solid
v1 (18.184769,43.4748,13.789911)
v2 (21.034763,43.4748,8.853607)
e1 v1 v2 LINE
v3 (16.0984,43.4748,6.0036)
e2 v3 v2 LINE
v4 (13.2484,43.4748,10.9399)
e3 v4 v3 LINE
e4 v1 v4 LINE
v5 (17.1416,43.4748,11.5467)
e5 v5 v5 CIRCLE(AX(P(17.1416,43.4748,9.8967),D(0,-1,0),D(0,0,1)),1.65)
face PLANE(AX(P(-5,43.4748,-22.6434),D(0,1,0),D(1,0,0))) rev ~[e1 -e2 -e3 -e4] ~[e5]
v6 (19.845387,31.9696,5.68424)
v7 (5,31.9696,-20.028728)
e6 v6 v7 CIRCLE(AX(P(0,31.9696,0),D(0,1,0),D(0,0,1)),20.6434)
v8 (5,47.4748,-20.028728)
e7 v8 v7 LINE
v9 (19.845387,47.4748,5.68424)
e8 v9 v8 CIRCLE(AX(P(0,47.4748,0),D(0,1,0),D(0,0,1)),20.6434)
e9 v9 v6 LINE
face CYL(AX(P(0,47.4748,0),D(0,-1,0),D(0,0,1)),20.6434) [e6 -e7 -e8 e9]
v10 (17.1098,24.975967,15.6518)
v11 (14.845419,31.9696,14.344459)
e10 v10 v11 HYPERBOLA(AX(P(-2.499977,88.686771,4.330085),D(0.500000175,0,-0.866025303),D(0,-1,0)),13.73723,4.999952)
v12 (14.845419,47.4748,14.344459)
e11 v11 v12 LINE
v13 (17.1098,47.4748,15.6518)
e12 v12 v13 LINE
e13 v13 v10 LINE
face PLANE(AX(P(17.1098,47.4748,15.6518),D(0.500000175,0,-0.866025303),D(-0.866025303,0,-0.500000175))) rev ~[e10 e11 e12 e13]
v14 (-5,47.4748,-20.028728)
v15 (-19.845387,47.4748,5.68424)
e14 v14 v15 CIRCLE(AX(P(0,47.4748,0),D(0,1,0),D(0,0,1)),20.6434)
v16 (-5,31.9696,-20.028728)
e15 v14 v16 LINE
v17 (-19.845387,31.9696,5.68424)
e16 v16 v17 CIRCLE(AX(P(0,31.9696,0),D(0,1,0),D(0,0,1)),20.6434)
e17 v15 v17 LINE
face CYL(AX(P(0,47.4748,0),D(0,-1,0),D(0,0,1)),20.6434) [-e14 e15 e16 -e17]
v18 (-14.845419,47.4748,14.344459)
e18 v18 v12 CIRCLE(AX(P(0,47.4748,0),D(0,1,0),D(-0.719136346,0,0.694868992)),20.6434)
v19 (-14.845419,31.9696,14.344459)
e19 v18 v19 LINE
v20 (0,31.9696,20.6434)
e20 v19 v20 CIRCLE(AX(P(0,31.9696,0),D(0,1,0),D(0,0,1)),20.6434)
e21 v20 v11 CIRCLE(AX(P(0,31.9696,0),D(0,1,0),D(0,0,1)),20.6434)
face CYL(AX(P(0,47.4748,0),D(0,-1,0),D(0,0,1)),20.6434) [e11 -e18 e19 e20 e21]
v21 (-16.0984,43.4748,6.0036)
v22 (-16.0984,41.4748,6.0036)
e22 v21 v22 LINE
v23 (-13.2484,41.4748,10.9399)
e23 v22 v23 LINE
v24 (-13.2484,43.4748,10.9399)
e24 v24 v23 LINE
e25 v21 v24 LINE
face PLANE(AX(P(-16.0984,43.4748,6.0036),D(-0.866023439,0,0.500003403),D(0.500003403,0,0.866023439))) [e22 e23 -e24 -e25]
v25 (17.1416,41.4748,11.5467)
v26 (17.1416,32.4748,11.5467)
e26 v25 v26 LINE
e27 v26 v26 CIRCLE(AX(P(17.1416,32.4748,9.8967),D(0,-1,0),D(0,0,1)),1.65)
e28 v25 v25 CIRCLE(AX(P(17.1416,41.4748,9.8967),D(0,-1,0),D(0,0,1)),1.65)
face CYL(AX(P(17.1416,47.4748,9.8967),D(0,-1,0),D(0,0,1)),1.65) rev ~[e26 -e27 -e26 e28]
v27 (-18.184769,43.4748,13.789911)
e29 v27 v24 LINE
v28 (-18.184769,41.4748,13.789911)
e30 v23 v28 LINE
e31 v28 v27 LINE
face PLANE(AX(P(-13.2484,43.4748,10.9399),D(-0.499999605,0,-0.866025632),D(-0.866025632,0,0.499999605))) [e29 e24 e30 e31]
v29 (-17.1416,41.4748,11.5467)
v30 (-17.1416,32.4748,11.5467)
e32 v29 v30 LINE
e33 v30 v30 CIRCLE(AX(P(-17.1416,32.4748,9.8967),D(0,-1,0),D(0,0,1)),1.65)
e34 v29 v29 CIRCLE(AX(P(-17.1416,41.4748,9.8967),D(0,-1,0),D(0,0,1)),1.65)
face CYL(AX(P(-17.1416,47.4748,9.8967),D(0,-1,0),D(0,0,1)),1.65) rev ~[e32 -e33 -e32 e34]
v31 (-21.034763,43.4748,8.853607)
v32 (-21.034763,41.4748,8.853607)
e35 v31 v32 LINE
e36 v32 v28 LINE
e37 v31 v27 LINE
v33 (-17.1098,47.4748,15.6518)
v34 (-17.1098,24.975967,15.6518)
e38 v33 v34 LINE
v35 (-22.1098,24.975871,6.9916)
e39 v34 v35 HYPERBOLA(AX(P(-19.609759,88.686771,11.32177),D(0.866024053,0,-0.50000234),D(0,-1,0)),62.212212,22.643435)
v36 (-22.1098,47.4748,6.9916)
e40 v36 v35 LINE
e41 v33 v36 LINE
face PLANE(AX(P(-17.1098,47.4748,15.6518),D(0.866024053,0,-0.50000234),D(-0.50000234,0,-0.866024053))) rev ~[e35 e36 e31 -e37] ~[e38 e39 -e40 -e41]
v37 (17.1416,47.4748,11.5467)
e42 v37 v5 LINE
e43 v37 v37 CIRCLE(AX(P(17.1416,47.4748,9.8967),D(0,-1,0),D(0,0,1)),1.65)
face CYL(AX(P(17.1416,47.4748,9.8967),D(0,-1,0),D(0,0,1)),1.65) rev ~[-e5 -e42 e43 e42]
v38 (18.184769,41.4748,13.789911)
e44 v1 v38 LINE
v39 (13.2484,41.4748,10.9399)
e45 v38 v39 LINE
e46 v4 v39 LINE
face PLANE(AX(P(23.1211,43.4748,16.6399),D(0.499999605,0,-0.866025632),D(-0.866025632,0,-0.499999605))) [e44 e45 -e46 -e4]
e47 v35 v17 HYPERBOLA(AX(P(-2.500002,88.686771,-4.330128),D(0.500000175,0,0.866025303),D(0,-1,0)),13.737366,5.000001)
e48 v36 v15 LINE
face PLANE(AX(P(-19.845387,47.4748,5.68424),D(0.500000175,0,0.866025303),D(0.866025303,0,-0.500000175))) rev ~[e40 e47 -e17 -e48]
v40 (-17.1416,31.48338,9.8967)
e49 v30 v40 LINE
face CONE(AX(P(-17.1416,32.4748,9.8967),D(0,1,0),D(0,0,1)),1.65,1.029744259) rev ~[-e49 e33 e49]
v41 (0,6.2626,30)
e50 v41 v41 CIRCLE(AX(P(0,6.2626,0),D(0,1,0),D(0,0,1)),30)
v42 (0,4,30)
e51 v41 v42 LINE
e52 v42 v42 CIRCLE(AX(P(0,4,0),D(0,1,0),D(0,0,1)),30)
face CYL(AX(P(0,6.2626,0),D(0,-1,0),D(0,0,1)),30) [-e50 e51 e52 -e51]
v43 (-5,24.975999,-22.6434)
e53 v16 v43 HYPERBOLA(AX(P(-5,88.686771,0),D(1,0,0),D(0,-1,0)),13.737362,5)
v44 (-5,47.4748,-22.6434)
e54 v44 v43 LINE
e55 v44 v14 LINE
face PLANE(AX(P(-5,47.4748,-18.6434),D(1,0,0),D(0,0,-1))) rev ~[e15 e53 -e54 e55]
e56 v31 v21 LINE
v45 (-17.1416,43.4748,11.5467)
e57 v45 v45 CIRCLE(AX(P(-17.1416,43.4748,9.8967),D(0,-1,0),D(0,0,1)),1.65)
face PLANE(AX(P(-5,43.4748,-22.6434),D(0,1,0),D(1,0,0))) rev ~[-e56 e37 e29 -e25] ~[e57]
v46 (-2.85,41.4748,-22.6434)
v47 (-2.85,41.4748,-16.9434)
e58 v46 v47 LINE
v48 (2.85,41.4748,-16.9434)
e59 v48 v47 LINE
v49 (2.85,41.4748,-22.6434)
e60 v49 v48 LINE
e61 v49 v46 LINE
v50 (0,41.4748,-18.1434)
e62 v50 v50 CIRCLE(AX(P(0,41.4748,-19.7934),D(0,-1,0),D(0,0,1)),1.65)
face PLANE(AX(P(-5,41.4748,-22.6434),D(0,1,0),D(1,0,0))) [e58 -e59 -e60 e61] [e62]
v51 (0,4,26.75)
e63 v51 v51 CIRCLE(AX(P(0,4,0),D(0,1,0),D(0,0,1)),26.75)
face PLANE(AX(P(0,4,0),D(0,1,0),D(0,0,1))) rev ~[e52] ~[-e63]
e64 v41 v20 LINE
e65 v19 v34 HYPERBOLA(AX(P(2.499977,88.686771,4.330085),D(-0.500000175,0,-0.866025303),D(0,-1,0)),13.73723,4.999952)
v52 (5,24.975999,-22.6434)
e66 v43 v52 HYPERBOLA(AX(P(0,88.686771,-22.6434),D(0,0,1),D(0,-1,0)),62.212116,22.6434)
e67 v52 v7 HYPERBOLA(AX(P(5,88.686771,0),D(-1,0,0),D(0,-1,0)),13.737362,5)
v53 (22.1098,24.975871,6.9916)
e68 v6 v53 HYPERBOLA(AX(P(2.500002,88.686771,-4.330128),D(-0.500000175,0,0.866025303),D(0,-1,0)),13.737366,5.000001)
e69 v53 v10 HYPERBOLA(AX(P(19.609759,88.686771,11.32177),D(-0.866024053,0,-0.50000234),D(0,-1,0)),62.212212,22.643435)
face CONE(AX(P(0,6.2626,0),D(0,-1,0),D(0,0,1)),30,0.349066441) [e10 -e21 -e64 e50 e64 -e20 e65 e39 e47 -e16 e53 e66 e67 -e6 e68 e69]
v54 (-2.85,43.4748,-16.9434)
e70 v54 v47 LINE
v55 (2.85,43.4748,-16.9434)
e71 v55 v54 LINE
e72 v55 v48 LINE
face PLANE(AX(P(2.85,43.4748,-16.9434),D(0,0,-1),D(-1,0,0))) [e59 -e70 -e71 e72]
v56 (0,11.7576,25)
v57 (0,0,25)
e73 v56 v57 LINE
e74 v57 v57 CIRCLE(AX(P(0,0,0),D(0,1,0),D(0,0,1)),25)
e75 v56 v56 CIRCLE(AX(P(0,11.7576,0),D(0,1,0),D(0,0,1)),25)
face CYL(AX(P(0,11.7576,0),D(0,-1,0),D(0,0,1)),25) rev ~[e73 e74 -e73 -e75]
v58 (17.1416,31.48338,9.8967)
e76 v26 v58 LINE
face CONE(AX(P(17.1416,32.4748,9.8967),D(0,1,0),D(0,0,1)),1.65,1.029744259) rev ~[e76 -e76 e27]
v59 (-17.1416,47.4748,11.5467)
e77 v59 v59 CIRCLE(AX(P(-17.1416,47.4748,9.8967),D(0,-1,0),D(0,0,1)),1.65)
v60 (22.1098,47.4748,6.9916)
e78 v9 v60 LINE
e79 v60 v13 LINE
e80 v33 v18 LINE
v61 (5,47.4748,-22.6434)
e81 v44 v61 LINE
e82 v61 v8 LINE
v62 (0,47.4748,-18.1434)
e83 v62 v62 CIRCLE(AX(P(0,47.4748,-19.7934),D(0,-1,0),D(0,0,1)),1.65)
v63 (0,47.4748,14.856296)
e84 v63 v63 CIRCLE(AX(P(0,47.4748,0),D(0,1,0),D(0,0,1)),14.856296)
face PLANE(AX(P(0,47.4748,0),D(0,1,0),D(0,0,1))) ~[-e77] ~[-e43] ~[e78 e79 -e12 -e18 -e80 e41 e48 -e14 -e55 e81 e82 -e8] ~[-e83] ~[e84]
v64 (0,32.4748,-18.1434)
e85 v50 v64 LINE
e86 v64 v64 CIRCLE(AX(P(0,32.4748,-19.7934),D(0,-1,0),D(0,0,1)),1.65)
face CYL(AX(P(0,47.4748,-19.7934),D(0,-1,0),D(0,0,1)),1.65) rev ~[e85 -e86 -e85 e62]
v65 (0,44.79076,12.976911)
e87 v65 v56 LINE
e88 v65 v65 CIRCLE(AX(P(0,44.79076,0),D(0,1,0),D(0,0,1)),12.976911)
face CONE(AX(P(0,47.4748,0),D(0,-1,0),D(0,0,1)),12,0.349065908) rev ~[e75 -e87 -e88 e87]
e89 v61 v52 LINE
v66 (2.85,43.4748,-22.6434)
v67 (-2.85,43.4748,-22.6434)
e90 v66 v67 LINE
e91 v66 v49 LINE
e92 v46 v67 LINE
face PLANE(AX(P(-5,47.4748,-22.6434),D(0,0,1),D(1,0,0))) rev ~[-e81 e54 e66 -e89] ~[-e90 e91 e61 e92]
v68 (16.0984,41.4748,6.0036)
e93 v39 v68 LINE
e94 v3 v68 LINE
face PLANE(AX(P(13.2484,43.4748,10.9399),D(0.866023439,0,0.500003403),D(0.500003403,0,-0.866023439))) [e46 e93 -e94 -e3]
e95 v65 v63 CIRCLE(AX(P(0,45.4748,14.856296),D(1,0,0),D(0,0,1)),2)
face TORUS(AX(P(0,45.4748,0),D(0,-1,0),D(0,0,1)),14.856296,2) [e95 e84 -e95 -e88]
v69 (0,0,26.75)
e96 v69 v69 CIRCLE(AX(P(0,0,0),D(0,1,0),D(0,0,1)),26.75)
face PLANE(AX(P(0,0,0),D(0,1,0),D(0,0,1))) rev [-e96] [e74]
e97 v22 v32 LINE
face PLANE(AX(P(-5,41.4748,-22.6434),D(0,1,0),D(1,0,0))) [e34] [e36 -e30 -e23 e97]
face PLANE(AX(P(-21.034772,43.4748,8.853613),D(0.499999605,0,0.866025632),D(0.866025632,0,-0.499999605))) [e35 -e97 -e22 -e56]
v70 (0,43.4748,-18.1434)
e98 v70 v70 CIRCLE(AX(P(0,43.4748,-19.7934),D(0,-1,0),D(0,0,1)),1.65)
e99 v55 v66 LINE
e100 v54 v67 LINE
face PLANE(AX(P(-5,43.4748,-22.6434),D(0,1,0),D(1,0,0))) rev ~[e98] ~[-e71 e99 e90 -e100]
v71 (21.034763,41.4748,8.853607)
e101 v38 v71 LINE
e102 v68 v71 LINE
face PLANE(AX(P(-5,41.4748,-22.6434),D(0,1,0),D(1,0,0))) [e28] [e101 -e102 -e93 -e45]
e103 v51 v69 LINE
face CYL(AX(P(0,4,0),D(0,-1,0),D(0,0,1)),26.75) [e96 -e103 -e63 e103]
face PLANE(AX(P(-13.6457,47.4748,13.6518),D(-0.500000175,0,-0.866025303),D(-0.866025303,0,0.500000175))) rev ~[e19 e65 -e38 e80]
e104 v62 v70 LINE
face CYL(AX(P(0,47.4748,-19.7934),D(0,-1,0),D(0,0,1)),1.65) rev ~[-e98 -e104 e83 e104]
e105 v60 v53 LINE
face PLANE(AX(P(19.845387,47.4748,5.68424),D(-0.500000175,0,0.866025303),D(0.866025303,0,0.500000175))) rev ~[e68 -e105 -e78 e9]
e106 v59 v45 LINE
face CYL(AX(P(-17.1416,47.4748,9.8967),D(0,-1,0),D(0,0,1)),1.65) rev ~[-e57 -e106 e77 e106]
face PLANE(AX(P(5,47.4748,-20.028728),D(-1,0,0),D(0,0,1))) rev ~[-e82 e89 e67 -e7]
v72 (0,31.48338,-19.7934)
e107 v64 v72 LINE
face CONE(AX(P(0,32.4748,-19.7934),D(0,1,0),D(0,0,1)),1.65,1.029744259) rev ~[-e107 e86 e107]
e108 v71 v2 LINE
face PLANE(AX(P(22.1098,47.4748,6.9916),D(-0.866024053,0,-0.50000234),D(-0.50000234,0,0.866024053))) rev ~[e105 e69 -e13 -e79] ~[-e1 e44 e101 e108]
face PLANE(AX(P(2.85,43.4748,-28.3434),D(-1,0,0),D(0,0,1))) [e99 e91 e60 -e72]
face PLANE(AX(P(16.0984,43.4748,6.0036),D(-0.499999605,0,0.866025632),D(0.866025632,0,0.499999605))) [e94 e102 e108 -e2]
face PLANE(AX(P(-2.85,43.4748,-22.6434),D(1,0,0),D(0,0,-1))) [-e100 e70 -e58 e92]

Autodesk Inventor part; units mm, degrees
ref_plane "YZ Plane" through (0, 0, 0) normal (1, 0, 0) x (0, 1, 0)
ref_plane "XZ Plane" through (0, 0, 0) normal (0, 1, 0) x (-1, 0, 0)
ref_plane "XY Plane" through (0, 0, 0) normal (0, 0, 1) x (1, 0, 0)
sketch "Skizze2" plane through (0, 0, 0) normal (1, 0, 0) x (0, 1, 0)
  line L0 (47.4748, 12) -> (11.7576, 25)
  line L1 (0, 0) -> (48.6481, 0)
  line L2 (47.4748, 12) -> (47.4748, 20.6434)
  line L3 (47.4748, 20.6434) -> (31.9696, 20.6434)
  line L4 (6.2626, 30) -> (31.9696, 20.6434)
  line L5 (4, 30) -> (4, 26.75)
  line L6 (4, 26.75) -> (0, 26.75)
  line L7 (6.2626, 30) -> (4, 30)
  line L8 (11.7576, 25) -> (0, 25)
  line L9 (0, 25) -> (0, 26.75)
  line L10 (0, 0) -> (0, 25) construction
  dimension "d21" = 24
  dimension "d22" = 20
  dimension "d115" = 15.5052
  dimension "d164" = 60
  dimension "d166" = 53.5
  dimension "d167" = 50
  dimension "d168" = 4
  dimension "d169" = 3.25
  dimension "d170" = 8.6434
  dimension "d171" = 47.4748
revolve "Umdrehung1" add sketch "Skizze2" angle 360 about axis through (0, 0, 0) along (0, 1, 0)
sketch "Skizze15" plane through (0, 47.4748, 0) normal (0, 1, 0) x (1, 0, 0)
  circle A0 centre (0, 0) radius 20.6434 projected
  circle A1 centre (0, 0) radius 12 projected
  line L0 (-5, 18.6434) -> (-5, 22.6434)
  line L1 (-5, 22.6434) -> (5, 22.6434)
  line L2 (5, 22.6434) -> (5, 18.6434)
  line L3 (5, 18.6434) -> (-5, 18.6434)
  line L4 (-5, 18.6434) -> (5, 22.6434) construction
  line L5 (-5, 22.6434) -> (5, 18.6434) construction
  line L6 (-17.1098, -15.6518) -> (-22.1098, -6.9916)
  line L7 (-22.1098, -6.9916) -> (-18.6457, -4.9916)
  line L8 (-18.6457, -4.9916) -> (-13.6457, -13.6518)
  line L9 (-13.6457, -13.6518) -> (-17.1098, -15.6518)
  line L10 (22.1098, -6.9916) -> (17.1098, -15.6518)
  line L11 (17.1098, -15.6518) -> (13.6457, -13.6518)
  line L12 (13.6457, -13.6518) -> (18.6457, -4.9916)
  line L13 (18.6457, -4.9916) -> (22.1098, -6.9916)
  point P0 (0, 20.6434)
  dimension "d129" = 10
  dimension "d130" = 4
  dimension "d131" = 18.6434
  dimension "d134" = 360
extrude "Extrusion12" add sketch "Skizze15" against normal blind 25 contours L2 L3 L0 A0 | A0 L0 L1 L2 | L13 L10 L11 A0 | A0 L11 L12 L13 | L7 L8 L9 A0 | A0 L9 L6 L7
delete faces "Fläche löschen5" heal yes whole lump no faces at (0, 24.7239, -18.6434) (0.5603, 22.4748, -19.4397)
delete faces "Fläche löschen6" heal yes whole lump no faces at (17.1154, 22.4748, 9.2346) (16.1457, 24.7239, 9.3217)
delete faces "Fläche löschen7" heal yes whole lump no faces at (-16.5551, 22.4748, 10.2051) (-16.1457, 24.7239, 9.3217)
ref_plane "Arbeitsebene2" through (-5, 43.4748, -22.6434) normal (0, 1, 0) x (1, 0, 0)
sketch "Skizze16" plane through (-5, 43.4748, -22.6434) normal (0, 1, 0) x (1, 0, 0)
  line L0 (-17.1098, -29.635) -> (-12.1098, -38.2953) projected
  line L1 (0, 0) -> (10, 0) projected
  line L2 (2.15, 5.7) -> (7.85, 5.7)
  line L3 (7.85, 5.7) -> (7.85, -5.7)
  line L4 (7.85, -5.7) -> (2.15, -5.7)
  line L5 (2.15, -5.7) -> (2.15, 5.7)
  line L6 (2.15, 5.7) -> (7.85, -5.7) construction
  line L7 (7.85, 5.7) -> (2.15, -5.7) construction
  line L8 (-20.9711, -34.347) -> (-11.0984, -28.647)
  line L9 (-18.1211, -39.2833) -> (-20.9711, -34.347)
  line L10 (-8.2484, -33.5833) -> (-18.1211, -39.2833)
  line L11 (-11.0984, -28.647) -> (-8.2484, -33.5833)
  line L12 (28.1211, -39.2833) -> (18.2484, -33.5833)
  line L13 (30.9711, -34.347) -> (28.1211, -39.2833)
  line L14 (21.0984, -28.647) -> (30.9711, -34.347)
  line L15 (18.2484, -33.5833) -> (21.0984, -28.647)
  point P0 (5, -22.6434)
  point P1 (5, 0)
  dimension "d139" = 5.7
  dimension "d140" = 11.4
  dimension "d143" = 360
extrude "Extrusion13" cut sketch "Skizze16" against normal blind 2
sketch "Skizze17" plane through (-5, 47.4748, -22.6434) normal (0, 1, 0) x (1, 0, 0)
  line L0 (0, 0) -> (10, 0) projected
  line L1 (5, -22.6434) -> (5, -2.85) construction
  point P0 (-12.1416, -32.5402)
  point P1 (22.1416, -32.5402)
  dimension "d147" = 2.85
  dimension "d150" = 360
hole "Bohrung3" at (0, 47.4748, -19.7934) at (-17.1416, 47.4748, 9.8967) at (17.1416, 47.4748, 9.8967) direction (0, -1, 0) diameter 3.3 depth 15 tip angle 118
fillet "Rundung1" radius 2 1 edges at (0, 47.4748, -12)
properties part number "endkappen"
